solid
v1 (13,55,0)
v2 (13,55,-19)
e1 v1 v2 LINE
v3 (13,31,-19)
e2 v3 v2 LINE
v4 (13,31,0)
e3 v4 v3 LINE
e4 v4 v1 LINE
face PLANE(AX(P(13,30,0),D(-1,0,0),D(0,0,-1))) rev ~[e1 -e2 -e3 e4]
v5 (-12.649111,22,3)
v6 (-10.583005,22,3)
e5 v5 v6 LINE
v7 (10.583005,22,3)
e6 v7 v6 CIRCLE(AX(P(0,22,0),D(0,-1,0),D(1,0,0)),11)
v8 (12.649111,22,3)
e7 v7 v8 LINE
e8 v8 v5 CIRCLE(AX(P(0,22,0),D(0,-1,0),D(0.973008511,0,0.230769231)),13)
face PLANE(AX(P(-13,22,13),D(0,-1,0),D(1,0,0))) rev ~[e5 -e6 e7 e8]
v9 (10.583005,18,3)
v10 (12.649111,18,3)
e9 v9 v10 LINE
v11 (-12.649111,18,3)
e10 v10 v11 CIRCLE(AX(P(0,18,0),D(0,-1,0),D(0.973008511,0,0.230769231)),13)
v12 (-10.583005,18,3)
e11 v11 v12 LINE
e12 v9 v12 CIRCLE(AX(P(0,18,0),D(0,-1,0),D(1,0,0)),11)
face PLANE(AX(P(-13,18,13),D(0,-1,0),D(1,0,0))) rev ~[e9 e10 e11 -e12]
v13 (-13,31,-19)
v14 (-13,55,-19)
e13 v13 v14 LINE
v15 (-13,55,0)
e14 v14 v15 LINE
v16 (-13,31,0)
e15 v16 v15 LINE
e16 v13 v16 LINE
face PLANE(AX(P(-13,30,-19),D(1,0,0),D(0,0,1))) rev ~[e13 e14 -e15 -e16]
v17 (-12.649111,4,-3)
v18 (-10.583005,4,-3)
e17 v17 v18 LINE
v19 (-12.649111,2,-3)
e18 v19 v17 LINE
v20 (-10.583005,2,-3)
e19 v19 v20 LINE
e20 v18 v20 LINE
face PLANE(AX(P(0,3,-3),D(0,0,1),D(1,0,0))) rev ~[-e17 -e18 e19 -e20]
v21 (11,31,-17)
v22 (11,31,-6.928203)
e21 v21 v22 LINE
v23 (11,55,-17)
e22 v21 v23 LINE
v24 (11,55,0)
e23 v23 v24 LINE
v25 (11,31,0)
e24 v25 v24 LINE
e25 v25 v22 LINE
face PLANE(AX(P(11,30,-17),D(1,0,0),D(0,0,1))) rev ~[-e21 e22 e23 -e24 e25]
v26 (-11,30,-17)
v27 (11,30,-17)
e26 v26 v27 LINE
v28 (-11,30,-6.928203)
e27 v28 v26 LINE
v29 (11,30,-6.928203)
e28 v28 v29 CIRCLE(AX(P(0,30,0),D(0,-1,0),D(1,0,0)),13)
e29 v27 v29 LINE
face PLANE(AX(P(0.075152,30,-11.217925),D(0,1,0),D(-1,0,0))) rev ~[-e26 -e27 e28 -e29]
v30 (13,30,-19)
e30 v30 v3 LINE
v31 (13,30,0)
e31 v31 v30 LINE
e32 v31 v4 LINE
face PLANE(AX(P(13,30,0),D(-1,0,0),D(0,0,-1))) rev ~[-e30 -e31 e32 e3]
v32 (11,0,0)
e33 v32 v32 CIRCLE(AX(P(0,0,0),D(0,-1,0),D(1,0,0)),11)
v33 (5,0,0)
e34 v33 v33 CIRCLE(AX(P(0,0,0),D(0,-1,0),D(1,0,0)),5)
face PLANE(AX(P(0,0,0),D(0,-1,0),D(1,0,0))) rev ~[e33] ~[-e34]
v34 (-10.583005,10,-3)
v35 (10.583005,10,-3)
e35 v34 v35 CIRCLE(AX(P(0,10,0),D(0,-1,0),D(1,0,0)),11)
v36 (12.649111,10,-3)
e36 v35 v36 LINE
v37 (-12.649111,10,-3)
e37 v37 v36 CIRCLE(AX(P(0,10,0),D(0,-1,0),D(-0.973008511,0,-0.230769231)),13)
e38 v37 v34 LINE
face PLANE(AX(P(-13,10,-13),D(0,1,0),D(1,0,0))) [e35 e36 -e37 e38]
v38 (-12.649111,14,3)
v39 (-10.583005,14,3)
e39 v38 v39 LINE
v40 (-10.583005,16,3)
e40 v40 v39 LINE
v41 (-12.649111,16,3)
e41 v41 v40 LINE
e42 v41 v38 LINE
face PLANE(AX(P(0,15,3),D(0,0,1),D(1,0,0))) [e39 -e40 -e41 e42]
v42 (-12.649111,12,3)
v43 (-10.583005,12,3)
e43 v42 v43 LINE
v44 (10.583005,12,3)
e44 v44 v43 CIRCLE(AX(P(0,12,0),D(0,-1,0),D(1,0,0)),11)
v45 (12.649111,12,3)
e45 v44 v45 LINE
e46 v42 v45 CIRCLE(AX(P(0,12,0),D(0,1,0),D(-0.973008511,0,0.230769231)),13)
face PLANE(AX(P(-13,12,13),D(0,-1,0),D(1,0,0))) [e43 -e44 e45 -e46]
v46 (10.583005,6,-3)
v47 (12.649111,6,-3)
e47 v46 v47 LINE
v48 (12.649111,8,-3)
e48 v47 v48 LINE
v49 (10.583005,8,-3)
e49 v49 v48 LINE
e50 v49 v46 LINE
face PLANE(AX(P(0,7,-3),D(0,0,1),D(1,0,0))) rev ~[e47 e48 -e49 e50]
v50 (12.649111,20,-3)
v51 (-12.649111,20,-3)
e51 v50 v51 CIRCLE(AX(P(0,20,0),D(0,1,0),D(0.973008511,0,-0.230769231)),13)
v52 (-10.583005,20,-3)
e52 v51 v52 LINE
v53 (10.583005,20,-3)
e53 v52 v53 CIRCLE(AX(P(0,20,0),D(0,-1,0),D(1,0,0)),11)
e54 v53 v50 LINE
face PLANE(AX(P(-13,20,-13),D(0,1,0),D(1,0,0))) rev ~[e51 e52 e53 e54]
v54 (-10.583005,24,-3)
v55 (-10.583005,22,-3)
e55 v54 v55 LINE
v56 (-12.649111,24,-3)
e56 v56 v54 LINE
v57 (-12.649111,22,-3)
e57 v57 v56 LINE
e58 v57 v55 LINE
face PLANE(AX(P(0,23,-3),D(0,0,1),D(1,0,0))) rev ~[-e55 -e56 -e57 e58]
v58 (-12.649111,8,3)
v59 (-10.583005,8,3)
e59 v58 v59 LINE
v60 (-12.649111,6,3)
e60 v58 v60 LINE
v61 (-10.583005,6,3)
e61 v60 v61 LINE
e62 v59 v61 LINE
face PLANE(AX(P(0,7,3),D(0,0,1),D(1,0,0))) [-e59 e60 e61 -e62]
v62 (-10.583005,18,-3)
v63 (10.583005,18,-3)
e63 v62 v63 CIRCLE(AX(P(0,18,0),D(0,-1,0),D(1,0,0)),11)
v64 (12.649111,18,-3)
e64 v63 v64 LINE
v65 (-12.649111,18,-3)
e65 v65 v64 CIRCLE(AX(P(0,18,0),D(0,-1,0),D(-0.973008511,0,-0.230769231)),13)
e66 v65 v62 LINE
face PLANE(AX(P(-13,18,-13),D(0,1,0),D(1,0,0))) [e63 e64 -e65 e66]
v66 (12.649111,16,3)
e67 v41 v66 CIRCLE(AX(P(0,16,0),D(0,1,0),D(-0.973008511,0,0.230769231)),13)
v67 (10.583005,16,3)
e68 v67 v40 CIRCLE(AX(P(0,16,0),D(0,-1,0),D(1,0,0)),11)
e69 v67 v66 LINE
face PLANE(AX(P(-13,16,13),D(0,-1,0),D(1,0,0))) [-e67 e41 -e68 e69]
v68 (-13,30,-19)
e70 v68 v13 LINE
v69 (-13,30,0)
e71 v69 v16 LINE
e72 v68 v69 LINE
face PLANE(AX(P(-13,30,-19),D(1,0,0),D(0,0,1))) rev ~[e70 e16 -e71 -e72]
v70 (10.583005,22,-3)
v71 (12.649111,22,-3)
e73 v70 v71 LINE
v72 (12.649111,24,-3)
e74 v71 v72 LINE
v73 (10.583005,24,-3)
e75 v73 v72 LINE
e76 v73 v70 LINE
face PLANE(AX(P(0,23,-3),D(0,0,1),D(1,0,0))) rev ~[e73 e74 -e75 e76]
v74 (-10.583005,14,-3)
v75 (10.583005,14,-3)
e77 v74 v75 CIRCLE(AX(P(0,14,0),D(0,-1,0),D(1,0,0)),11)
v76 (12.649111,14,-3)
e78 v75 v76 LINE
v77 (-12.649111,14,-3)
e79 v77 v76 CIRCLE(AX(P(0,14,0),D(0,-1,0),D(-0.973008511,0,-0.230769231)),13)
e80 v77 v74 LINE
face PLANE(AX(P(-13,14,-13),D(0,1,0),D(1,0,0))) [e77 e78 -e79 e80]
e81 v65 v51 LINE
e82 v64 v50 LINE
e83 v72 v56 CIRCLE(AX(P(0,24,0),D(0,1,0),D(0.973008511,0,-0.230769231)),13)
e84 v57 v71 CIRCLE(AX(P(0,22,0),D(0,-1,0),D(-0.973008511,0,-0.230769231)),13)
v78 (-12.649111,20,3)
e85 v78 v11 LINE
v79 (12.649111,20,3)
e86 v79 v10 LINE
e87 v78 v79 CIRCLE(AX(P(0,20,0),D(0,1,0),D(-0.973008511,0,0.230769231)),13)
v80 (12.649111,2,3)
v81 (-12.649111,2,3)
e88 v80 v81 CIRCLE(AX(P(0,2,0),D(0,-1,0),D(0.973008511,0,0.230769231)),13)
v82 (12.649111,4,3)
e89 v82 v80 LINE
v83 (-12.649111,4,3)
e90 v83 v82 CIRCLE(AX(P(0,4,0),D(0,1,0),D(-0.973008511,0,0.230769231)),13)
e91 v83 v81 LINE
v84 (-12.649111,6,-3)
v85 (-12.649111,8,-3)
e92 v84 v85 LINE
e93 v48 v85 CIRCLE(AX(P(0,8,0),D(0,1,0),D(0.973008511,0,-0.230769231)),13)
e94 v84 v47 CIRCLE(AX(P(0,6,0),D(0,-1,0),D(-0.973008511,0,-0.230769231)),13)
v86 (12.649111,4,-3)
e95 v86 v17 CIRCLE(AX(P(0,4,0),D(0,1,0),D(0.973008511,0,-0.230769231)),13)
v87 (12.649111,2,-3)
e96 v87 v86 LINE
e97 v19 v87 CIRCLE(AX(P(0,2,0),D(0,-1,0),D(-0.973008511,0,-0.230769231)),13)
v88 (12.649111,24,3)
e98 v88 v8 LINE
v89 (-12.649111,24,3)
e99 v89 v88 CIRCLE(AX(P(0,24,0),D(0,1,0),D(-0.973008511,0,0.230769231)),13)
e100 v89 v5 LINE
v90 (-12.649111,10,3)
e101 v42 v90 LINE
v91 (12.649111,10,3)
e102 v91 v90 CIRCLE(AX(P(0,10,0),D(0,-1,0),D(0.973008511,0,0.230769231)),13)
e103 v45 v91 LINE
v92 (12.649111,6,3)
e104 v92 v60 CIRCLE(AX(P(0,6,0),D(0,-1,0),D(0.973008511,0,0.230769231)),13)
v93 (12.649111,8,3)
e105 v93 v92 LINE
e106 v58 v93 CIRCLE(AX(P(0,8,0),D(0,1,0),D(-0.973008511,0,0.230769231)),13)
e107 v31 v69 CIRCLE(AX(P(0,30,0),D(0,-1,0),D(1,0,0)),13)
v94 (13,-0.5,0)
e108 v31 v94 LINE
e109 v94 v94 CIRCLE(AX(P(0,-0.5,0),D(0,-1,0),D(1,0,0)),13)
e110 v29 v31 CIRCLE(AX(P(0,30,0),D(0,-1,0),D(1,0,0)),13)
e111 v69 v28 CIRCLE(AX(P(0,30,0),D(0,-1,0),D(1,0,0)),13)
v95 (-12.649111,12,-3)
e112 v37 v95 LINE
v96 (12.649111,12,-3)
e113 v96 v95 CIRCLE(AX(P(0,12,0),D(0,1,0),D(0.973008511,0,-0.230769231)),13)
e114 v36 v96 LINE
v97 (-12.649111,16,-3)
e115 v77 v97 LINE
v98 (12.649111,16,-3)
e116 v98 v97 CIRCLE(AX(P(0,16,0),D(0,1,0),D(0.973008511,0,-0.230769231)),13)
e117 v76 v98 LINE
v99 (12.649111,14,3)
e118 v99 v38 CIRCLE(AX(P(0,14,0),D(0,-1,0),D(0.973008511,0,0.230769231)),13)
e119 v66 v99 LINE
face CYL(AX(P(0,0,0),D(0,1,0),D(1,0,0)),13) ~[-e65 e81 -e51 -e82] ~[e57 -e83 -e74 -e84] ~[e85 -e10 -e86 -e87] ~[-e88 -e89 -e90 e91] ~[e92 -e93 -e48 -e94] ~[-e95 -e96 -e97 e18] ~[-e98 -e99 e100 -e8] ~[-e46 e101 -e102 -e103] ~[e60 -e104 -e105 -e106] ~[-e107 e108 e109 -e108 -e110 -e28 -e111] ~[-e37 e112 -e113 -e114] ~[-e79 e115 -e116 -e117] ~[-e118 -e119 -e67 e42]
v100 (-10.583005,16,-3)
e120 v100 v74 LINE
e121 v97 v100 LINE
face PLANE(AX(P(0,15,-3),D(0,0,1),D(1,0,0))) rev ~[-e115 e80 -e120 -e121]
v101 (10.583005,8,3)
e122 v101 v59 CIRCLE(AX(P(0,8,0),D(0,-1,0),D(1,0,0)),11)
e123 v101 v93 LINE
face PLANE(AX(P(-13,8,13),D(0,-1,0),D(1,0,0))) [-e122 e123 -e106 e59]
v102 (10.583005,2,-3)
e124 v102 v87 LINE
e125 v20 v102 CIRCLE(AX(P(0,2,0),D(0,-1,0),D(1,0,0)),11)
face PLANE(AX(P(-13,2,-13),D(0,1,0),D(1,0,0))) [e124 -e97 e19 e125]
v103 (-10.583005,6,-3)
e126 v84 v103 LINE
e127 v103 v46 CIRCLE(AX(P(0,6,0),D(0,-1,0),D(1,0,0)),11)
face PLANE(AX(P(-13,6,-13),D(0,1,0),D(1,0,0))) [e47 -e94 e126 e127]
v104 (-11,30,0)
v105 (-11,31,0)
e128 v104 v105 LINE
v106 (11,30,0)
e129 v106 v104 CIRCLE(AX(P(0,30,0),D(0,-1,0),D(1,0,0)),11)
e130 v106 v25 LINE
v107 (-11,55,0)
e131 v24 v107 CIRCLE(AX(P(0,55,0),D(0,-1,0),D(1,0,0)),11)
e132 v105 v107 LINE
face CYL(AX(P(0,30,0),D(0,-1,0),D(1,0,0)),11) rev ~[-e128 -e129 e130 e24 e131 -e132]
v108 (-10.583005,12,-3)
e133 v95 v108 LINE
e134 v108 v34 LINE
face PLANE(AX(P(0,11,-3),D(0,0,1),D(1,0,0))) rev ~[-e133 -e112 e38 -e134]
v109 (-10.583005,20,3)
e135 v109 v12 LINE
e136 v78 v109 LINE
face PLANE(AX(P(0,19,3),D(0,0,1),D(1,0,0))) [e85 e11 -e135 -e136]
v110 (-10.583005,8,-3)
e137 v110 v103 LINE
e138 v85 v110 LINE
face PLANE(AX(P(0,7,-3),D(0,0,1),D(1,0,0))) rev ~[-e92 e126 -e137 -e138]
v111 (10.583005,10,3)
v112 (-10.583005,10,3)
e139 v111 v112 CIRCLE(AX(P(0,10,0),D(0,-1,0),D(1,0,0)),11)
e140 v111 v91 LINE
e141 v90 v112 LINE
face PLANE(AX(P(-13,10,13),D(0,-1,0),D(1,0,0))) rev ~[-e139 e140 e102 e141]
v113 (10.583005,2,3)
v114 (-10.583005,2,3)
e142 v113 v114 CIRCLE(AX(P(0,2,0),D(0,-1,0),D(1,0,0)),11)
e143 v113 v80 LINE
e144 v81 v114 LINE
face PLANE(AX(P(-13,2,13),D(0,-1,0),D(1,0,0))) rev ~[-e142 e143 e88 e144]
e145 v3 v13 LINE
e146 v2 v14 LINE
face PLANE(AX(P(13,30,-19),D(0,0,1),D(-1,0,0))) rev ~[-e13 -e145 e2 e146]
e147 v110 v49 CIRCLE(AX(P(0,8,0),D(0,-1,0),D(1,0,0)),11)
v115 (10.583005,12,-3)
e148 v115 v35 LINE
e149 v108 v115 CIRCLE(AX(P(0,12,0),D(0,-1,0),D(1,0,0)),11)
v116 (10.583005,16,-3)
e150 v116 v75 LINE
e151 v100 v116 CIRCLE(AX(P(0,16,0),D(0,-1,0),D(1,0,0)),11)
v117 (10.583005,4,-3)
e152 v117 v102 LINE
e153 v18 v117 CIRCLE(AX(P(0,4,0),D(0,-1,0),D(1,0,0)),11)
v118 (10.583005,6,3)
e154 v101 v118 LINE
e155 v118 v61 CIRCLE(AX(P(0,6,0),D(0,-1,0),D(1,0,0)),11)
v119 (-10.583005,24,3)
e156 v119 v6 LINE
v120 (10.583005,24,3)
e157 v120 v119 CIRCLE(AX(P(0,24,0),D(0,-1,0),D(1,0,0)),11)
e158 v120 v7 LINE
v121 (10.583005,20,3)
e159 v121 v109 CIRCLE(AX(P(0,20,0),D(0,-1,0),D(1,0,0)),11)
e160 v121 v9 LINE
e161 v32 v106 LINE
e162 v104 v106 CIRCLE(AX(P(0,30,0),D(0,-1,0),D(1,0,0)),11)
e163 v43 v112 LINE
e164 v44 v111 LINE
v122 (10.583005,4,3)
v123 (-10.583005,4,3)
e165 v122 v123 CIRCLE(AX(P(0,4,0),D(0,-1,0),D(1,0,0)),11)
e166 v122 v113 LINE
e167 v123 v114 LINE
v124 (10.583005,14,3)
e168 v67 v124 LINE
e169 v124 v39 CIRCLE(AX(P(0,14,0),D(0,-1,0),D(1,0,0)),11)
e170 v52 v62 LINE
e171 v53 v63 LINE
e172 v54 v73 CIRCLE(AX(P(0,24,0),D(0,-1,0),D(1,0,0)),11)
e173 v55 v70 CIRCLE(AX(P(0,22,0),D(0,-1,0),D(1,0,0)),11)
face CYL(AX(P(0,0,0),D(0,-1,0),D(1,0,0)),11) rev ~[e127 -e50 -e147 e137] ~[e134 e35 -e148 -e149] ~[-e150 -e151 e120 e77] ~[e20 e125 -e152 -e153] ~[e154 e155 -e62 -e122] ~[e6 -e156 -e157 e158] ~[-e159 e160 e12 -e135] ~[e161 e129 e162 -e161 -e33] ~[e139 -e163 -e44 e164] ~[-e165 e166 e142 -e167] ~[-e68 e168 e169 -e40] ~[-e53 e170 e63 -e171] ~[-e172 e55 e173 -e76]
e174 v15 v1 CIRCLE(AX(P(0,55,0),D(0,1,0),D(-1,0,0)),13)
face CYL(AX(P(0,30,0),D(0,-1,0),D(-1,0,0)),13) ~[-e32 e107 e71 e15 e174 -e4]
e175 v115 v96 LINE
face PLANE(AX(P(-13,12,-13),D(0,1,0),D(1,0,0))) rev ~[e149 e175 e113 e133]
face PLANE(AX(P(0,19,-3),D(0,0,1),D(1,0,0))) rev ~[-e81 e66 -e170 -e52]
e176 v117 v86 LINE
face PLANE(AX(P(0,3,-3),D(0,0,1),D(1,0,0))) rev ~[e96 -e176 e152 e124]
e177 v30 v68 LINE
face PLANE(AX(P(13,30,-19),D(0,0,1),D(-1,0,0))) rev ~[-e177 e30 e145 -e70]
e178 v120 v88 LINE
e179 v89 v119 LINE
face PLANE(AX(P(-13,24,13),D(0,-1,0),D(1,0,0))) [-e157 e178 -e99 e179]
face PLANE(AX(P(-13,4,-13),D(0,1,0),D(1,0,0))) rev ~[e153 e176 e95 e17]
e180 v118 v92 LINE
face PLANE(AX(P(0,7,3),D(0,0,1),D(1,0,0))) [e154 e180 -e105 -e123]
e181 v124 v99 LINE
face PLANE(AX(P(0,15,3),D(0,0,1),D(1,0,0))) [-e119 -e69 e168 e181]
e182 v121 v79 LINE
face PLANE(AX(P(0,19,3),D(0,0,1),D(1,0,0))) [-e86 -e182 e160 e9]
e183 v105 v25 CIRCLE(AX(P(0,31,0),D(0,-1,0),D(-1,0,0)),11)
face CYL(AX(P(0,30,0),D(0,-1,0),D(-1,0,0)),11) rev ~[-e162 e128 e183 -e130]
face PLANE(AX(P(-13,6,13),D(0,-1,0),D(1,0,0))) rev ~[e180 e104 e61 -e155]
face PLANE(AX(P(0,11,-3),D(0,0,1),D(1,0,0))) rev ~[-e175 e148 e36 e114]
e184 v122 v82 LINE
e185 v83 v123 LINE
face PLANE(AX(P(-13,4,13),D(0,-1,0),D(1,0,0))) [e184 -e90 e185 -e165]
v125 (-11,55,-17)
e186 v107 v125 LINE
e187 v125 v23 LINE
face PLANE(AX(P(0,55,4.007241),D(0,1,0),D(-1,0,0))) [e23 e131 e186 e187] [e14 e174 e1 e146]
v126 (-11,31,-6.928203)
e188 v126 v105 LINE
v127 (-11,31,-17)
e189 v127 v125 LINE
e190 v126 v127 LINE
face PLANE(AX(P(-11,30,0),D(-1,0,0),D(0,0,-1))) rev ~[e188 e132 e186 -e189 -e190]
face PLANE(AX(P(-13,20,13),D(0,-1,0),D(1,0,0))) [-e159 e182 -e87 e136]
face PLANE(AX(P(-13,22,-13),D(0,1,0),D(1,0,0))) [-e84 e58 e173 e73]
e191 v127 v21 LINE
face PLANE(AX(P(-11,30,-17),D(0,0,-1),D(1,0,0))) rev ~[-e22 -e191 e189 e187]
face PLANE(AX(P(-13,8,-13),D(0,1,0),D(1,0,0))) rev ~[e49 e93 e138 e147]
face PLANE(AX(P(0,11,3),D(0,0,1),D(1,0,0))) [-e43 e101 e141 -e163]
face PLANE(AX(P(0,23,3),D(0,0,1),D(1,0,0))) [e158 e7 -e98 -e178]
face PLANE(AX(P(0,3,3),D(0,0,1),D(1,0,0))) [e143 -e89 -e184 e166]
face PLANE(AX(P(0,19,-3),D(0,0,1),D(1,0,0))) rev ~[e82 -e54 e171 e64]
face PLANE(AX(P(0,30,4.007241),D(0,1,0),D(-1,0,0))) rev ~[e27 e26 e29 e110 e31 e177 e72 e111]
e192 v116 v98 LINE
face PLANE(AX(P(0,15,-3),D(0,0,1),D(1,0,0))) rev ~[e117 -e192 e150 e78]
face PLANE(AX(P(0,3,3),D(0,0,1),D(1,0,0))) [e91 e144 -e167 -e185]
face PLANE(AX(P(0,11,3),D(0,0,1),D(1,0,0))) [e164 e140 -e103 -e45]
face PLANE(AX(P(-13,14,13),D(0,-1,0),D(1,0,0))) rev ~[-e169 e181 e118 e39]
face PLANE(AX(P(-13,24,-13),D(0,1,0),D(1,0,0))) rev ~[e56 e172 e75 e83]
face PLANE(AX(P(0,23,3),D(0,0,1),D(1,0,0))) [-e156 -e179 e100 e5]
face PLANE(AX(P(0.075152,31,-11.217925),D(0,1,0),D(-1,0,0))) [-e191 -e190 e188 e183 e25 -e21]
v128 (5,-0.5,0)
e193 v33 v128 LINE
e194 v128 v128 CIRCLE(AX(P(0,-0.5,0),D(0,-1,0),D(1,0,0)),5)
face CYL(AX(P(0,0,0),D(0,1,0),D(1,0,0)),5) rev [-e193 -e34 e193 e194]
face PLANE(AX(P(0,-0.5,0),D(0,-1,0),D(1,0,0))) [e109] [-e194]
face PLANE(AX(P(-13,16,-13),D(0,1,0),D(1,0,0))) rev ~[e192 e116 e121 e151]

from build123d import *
from build123d import SkipClean  # not in build123d's __all__

# Parameters (mm, degrees)
F0_R      = 13
F0_R_2    = 11
F1_DEPTH  = 30
F2_R      = 13
F2_R_2    = 5
F3_DEPTH  = 0.5
F5_W      = 26
F5_H      = 2
F6_DEPTH  = 10
F8_W      = 26
F8_H      = 2
F9_DEPTH  = 10
F11_DEPTH = 25
F13_DEPTH = 1


with BuildPart() as f1:
    # F0 (on Front) → F1 (new body)
    with BuildSketch(Plane.XZ):
        Circle(F0_R)
        Circle(F0_R_2, mode=Mode.SUBTRACT)
    extrude(amount=-F1_DEPTH)

    # F2 (on Front) → F3 (join)
    with BuildSketch(Plane.XZ):
        Circle(F2_R)
        Circle(F2_R_2, mode=Mode.SUBTRACT)
    extrude(amount=F3_DEPTH)

    # F5 (on offset) → F6 (cut)
    with BuildSketch(Plane.XY.offset(13)):
        with Locations((-2.682e-07, 2.9999998622)):
            Rectangle(F5_W, F5_H)
        with Locations((-2.682e-07, 22.9999998622)):
            Rectangle(F5_W, F5_H)
        with Locations((-2.682e-07, 6.9999998622)):
            Rectangle(F5_W, F5_H)
        with Locations((-2.682e-07, 10.9999998622)):
            Rectangle(F5_W, F5_H)
        with Locations((-2.682e-07, 14.9999998622)):
            Rectangle(F5_W, F5_H)
        with Locations((-2.682e-07, 18.9999998622)):
            Rectangle(F5_W, F5_H)
    extrude(amount=-F6_DEPTH, mode=Mode.SUBTRACT)

    # F8 (on offset) → F9 (cut)
    with BuildSketch(Plane.XY.offset(-13)):
        with Locations((0, 3)):
            Rectangle(F8_W, F8_H)
        with Locations((0, 7)):
            Rectangle(F8_W, F8_H)
        with Locations((0, 11)):
            Rectangle(F8_W, F8_H)
        with Locations((0, 15)):
            Rectangle(F8_W, F8_H)
        with Locations((0, 19)):
            Rectangle(F8_W, F8_H)
        with Locations((0, 23)):
            Rectangle(F8_W, F8_H)
    extrude(amount=F9_DEPTH, mode=Mode.SUBTRACT)

    # F10 (on face) → F11 (join)
    with BuildSketch(Plane(origin=(0, 30, 0), x_dir=(-1, 0, 0), z_dir=(0, 1, 0))):
        with BuildLine():
            Line((11, 0), (11, -6.9282032303))
            ThreePointArc((11, -6.9282032303), (12.4899959968, -3.6055512755), (13, 0))
            ThreePointArc((13, 0), (0, 13), (-13, 0))
            ThreePointArc((-13, 0), (-12.4899959968, -3.6055512755), (-11, -6.9282032303))
            Line((-11, -6.9282032303), (-11, 0))
            ThreePointArc((-11, 0), (0, 11), (11, 0))
        make_face()
        with BuildLine():
            ThreePointArc((13, 0), (12.4899959968, -3.6055512755), (11, -6.9282032303))
            Line((11, -6.9282032303), (11, -17))
            Line((11, -17), (-11, -17))
            Line((-11, -17), (-11, -6.9282032303))
            ThreePointArc((-11, -6.9282032303), (-12.4899959968, -3.6055512755), (-13, 0))
            Line((-13, 0), (-13, -19))
            Line((-13, -19), (13, -19))
            Line((13, -19), (13, 0))
        make_face()
    with SkipClean():  # cleaning this boolean's faces spoils the solid; the shape is the same uncleaned
        extrude(amount=F11_DEPTH)

    # F12 (on face) → F13 (join)
    with BuildSketch(Plane(origin=(0, 30, 0), x_dir=(-1, 0, 0), z_dir=(0, 1, 0))):
        with BuildLine():
            Line((13, -19), (13, 0))
            ThreePointArc((13, 0), (12.4899959968, -3.6055512755), (11, -6.9282032303))
            ThreePointArc((11, -6.9282032303), (0, -13), (-11, -6.9282032303))
            ThreePointArc((-11, -6.9282032303), (-12.4899959968, -3.6055512755), (-13, 0))
            Line((-13, 0), (-13, -19))
            Line((-13, -19), (13, -19))
        make_face()
        with BuildLine():
            ThreePointArc((-11, -6.9282032303), (0, -13), (11, -6.9282032303))
            Line((11, -6.9282032303), (11, 0))
            ThreePointArc((11, 0), (0, -11), (-11, 0))
            Line((-11, 0), (-11, -6.9282032303))
        make_face()
    with SkipClean():  # cleaning this boolean's faces spoils the solid; the shape is the same uncleaned
        extrude(amount=F13_DEPTH)


solid = f1.part
